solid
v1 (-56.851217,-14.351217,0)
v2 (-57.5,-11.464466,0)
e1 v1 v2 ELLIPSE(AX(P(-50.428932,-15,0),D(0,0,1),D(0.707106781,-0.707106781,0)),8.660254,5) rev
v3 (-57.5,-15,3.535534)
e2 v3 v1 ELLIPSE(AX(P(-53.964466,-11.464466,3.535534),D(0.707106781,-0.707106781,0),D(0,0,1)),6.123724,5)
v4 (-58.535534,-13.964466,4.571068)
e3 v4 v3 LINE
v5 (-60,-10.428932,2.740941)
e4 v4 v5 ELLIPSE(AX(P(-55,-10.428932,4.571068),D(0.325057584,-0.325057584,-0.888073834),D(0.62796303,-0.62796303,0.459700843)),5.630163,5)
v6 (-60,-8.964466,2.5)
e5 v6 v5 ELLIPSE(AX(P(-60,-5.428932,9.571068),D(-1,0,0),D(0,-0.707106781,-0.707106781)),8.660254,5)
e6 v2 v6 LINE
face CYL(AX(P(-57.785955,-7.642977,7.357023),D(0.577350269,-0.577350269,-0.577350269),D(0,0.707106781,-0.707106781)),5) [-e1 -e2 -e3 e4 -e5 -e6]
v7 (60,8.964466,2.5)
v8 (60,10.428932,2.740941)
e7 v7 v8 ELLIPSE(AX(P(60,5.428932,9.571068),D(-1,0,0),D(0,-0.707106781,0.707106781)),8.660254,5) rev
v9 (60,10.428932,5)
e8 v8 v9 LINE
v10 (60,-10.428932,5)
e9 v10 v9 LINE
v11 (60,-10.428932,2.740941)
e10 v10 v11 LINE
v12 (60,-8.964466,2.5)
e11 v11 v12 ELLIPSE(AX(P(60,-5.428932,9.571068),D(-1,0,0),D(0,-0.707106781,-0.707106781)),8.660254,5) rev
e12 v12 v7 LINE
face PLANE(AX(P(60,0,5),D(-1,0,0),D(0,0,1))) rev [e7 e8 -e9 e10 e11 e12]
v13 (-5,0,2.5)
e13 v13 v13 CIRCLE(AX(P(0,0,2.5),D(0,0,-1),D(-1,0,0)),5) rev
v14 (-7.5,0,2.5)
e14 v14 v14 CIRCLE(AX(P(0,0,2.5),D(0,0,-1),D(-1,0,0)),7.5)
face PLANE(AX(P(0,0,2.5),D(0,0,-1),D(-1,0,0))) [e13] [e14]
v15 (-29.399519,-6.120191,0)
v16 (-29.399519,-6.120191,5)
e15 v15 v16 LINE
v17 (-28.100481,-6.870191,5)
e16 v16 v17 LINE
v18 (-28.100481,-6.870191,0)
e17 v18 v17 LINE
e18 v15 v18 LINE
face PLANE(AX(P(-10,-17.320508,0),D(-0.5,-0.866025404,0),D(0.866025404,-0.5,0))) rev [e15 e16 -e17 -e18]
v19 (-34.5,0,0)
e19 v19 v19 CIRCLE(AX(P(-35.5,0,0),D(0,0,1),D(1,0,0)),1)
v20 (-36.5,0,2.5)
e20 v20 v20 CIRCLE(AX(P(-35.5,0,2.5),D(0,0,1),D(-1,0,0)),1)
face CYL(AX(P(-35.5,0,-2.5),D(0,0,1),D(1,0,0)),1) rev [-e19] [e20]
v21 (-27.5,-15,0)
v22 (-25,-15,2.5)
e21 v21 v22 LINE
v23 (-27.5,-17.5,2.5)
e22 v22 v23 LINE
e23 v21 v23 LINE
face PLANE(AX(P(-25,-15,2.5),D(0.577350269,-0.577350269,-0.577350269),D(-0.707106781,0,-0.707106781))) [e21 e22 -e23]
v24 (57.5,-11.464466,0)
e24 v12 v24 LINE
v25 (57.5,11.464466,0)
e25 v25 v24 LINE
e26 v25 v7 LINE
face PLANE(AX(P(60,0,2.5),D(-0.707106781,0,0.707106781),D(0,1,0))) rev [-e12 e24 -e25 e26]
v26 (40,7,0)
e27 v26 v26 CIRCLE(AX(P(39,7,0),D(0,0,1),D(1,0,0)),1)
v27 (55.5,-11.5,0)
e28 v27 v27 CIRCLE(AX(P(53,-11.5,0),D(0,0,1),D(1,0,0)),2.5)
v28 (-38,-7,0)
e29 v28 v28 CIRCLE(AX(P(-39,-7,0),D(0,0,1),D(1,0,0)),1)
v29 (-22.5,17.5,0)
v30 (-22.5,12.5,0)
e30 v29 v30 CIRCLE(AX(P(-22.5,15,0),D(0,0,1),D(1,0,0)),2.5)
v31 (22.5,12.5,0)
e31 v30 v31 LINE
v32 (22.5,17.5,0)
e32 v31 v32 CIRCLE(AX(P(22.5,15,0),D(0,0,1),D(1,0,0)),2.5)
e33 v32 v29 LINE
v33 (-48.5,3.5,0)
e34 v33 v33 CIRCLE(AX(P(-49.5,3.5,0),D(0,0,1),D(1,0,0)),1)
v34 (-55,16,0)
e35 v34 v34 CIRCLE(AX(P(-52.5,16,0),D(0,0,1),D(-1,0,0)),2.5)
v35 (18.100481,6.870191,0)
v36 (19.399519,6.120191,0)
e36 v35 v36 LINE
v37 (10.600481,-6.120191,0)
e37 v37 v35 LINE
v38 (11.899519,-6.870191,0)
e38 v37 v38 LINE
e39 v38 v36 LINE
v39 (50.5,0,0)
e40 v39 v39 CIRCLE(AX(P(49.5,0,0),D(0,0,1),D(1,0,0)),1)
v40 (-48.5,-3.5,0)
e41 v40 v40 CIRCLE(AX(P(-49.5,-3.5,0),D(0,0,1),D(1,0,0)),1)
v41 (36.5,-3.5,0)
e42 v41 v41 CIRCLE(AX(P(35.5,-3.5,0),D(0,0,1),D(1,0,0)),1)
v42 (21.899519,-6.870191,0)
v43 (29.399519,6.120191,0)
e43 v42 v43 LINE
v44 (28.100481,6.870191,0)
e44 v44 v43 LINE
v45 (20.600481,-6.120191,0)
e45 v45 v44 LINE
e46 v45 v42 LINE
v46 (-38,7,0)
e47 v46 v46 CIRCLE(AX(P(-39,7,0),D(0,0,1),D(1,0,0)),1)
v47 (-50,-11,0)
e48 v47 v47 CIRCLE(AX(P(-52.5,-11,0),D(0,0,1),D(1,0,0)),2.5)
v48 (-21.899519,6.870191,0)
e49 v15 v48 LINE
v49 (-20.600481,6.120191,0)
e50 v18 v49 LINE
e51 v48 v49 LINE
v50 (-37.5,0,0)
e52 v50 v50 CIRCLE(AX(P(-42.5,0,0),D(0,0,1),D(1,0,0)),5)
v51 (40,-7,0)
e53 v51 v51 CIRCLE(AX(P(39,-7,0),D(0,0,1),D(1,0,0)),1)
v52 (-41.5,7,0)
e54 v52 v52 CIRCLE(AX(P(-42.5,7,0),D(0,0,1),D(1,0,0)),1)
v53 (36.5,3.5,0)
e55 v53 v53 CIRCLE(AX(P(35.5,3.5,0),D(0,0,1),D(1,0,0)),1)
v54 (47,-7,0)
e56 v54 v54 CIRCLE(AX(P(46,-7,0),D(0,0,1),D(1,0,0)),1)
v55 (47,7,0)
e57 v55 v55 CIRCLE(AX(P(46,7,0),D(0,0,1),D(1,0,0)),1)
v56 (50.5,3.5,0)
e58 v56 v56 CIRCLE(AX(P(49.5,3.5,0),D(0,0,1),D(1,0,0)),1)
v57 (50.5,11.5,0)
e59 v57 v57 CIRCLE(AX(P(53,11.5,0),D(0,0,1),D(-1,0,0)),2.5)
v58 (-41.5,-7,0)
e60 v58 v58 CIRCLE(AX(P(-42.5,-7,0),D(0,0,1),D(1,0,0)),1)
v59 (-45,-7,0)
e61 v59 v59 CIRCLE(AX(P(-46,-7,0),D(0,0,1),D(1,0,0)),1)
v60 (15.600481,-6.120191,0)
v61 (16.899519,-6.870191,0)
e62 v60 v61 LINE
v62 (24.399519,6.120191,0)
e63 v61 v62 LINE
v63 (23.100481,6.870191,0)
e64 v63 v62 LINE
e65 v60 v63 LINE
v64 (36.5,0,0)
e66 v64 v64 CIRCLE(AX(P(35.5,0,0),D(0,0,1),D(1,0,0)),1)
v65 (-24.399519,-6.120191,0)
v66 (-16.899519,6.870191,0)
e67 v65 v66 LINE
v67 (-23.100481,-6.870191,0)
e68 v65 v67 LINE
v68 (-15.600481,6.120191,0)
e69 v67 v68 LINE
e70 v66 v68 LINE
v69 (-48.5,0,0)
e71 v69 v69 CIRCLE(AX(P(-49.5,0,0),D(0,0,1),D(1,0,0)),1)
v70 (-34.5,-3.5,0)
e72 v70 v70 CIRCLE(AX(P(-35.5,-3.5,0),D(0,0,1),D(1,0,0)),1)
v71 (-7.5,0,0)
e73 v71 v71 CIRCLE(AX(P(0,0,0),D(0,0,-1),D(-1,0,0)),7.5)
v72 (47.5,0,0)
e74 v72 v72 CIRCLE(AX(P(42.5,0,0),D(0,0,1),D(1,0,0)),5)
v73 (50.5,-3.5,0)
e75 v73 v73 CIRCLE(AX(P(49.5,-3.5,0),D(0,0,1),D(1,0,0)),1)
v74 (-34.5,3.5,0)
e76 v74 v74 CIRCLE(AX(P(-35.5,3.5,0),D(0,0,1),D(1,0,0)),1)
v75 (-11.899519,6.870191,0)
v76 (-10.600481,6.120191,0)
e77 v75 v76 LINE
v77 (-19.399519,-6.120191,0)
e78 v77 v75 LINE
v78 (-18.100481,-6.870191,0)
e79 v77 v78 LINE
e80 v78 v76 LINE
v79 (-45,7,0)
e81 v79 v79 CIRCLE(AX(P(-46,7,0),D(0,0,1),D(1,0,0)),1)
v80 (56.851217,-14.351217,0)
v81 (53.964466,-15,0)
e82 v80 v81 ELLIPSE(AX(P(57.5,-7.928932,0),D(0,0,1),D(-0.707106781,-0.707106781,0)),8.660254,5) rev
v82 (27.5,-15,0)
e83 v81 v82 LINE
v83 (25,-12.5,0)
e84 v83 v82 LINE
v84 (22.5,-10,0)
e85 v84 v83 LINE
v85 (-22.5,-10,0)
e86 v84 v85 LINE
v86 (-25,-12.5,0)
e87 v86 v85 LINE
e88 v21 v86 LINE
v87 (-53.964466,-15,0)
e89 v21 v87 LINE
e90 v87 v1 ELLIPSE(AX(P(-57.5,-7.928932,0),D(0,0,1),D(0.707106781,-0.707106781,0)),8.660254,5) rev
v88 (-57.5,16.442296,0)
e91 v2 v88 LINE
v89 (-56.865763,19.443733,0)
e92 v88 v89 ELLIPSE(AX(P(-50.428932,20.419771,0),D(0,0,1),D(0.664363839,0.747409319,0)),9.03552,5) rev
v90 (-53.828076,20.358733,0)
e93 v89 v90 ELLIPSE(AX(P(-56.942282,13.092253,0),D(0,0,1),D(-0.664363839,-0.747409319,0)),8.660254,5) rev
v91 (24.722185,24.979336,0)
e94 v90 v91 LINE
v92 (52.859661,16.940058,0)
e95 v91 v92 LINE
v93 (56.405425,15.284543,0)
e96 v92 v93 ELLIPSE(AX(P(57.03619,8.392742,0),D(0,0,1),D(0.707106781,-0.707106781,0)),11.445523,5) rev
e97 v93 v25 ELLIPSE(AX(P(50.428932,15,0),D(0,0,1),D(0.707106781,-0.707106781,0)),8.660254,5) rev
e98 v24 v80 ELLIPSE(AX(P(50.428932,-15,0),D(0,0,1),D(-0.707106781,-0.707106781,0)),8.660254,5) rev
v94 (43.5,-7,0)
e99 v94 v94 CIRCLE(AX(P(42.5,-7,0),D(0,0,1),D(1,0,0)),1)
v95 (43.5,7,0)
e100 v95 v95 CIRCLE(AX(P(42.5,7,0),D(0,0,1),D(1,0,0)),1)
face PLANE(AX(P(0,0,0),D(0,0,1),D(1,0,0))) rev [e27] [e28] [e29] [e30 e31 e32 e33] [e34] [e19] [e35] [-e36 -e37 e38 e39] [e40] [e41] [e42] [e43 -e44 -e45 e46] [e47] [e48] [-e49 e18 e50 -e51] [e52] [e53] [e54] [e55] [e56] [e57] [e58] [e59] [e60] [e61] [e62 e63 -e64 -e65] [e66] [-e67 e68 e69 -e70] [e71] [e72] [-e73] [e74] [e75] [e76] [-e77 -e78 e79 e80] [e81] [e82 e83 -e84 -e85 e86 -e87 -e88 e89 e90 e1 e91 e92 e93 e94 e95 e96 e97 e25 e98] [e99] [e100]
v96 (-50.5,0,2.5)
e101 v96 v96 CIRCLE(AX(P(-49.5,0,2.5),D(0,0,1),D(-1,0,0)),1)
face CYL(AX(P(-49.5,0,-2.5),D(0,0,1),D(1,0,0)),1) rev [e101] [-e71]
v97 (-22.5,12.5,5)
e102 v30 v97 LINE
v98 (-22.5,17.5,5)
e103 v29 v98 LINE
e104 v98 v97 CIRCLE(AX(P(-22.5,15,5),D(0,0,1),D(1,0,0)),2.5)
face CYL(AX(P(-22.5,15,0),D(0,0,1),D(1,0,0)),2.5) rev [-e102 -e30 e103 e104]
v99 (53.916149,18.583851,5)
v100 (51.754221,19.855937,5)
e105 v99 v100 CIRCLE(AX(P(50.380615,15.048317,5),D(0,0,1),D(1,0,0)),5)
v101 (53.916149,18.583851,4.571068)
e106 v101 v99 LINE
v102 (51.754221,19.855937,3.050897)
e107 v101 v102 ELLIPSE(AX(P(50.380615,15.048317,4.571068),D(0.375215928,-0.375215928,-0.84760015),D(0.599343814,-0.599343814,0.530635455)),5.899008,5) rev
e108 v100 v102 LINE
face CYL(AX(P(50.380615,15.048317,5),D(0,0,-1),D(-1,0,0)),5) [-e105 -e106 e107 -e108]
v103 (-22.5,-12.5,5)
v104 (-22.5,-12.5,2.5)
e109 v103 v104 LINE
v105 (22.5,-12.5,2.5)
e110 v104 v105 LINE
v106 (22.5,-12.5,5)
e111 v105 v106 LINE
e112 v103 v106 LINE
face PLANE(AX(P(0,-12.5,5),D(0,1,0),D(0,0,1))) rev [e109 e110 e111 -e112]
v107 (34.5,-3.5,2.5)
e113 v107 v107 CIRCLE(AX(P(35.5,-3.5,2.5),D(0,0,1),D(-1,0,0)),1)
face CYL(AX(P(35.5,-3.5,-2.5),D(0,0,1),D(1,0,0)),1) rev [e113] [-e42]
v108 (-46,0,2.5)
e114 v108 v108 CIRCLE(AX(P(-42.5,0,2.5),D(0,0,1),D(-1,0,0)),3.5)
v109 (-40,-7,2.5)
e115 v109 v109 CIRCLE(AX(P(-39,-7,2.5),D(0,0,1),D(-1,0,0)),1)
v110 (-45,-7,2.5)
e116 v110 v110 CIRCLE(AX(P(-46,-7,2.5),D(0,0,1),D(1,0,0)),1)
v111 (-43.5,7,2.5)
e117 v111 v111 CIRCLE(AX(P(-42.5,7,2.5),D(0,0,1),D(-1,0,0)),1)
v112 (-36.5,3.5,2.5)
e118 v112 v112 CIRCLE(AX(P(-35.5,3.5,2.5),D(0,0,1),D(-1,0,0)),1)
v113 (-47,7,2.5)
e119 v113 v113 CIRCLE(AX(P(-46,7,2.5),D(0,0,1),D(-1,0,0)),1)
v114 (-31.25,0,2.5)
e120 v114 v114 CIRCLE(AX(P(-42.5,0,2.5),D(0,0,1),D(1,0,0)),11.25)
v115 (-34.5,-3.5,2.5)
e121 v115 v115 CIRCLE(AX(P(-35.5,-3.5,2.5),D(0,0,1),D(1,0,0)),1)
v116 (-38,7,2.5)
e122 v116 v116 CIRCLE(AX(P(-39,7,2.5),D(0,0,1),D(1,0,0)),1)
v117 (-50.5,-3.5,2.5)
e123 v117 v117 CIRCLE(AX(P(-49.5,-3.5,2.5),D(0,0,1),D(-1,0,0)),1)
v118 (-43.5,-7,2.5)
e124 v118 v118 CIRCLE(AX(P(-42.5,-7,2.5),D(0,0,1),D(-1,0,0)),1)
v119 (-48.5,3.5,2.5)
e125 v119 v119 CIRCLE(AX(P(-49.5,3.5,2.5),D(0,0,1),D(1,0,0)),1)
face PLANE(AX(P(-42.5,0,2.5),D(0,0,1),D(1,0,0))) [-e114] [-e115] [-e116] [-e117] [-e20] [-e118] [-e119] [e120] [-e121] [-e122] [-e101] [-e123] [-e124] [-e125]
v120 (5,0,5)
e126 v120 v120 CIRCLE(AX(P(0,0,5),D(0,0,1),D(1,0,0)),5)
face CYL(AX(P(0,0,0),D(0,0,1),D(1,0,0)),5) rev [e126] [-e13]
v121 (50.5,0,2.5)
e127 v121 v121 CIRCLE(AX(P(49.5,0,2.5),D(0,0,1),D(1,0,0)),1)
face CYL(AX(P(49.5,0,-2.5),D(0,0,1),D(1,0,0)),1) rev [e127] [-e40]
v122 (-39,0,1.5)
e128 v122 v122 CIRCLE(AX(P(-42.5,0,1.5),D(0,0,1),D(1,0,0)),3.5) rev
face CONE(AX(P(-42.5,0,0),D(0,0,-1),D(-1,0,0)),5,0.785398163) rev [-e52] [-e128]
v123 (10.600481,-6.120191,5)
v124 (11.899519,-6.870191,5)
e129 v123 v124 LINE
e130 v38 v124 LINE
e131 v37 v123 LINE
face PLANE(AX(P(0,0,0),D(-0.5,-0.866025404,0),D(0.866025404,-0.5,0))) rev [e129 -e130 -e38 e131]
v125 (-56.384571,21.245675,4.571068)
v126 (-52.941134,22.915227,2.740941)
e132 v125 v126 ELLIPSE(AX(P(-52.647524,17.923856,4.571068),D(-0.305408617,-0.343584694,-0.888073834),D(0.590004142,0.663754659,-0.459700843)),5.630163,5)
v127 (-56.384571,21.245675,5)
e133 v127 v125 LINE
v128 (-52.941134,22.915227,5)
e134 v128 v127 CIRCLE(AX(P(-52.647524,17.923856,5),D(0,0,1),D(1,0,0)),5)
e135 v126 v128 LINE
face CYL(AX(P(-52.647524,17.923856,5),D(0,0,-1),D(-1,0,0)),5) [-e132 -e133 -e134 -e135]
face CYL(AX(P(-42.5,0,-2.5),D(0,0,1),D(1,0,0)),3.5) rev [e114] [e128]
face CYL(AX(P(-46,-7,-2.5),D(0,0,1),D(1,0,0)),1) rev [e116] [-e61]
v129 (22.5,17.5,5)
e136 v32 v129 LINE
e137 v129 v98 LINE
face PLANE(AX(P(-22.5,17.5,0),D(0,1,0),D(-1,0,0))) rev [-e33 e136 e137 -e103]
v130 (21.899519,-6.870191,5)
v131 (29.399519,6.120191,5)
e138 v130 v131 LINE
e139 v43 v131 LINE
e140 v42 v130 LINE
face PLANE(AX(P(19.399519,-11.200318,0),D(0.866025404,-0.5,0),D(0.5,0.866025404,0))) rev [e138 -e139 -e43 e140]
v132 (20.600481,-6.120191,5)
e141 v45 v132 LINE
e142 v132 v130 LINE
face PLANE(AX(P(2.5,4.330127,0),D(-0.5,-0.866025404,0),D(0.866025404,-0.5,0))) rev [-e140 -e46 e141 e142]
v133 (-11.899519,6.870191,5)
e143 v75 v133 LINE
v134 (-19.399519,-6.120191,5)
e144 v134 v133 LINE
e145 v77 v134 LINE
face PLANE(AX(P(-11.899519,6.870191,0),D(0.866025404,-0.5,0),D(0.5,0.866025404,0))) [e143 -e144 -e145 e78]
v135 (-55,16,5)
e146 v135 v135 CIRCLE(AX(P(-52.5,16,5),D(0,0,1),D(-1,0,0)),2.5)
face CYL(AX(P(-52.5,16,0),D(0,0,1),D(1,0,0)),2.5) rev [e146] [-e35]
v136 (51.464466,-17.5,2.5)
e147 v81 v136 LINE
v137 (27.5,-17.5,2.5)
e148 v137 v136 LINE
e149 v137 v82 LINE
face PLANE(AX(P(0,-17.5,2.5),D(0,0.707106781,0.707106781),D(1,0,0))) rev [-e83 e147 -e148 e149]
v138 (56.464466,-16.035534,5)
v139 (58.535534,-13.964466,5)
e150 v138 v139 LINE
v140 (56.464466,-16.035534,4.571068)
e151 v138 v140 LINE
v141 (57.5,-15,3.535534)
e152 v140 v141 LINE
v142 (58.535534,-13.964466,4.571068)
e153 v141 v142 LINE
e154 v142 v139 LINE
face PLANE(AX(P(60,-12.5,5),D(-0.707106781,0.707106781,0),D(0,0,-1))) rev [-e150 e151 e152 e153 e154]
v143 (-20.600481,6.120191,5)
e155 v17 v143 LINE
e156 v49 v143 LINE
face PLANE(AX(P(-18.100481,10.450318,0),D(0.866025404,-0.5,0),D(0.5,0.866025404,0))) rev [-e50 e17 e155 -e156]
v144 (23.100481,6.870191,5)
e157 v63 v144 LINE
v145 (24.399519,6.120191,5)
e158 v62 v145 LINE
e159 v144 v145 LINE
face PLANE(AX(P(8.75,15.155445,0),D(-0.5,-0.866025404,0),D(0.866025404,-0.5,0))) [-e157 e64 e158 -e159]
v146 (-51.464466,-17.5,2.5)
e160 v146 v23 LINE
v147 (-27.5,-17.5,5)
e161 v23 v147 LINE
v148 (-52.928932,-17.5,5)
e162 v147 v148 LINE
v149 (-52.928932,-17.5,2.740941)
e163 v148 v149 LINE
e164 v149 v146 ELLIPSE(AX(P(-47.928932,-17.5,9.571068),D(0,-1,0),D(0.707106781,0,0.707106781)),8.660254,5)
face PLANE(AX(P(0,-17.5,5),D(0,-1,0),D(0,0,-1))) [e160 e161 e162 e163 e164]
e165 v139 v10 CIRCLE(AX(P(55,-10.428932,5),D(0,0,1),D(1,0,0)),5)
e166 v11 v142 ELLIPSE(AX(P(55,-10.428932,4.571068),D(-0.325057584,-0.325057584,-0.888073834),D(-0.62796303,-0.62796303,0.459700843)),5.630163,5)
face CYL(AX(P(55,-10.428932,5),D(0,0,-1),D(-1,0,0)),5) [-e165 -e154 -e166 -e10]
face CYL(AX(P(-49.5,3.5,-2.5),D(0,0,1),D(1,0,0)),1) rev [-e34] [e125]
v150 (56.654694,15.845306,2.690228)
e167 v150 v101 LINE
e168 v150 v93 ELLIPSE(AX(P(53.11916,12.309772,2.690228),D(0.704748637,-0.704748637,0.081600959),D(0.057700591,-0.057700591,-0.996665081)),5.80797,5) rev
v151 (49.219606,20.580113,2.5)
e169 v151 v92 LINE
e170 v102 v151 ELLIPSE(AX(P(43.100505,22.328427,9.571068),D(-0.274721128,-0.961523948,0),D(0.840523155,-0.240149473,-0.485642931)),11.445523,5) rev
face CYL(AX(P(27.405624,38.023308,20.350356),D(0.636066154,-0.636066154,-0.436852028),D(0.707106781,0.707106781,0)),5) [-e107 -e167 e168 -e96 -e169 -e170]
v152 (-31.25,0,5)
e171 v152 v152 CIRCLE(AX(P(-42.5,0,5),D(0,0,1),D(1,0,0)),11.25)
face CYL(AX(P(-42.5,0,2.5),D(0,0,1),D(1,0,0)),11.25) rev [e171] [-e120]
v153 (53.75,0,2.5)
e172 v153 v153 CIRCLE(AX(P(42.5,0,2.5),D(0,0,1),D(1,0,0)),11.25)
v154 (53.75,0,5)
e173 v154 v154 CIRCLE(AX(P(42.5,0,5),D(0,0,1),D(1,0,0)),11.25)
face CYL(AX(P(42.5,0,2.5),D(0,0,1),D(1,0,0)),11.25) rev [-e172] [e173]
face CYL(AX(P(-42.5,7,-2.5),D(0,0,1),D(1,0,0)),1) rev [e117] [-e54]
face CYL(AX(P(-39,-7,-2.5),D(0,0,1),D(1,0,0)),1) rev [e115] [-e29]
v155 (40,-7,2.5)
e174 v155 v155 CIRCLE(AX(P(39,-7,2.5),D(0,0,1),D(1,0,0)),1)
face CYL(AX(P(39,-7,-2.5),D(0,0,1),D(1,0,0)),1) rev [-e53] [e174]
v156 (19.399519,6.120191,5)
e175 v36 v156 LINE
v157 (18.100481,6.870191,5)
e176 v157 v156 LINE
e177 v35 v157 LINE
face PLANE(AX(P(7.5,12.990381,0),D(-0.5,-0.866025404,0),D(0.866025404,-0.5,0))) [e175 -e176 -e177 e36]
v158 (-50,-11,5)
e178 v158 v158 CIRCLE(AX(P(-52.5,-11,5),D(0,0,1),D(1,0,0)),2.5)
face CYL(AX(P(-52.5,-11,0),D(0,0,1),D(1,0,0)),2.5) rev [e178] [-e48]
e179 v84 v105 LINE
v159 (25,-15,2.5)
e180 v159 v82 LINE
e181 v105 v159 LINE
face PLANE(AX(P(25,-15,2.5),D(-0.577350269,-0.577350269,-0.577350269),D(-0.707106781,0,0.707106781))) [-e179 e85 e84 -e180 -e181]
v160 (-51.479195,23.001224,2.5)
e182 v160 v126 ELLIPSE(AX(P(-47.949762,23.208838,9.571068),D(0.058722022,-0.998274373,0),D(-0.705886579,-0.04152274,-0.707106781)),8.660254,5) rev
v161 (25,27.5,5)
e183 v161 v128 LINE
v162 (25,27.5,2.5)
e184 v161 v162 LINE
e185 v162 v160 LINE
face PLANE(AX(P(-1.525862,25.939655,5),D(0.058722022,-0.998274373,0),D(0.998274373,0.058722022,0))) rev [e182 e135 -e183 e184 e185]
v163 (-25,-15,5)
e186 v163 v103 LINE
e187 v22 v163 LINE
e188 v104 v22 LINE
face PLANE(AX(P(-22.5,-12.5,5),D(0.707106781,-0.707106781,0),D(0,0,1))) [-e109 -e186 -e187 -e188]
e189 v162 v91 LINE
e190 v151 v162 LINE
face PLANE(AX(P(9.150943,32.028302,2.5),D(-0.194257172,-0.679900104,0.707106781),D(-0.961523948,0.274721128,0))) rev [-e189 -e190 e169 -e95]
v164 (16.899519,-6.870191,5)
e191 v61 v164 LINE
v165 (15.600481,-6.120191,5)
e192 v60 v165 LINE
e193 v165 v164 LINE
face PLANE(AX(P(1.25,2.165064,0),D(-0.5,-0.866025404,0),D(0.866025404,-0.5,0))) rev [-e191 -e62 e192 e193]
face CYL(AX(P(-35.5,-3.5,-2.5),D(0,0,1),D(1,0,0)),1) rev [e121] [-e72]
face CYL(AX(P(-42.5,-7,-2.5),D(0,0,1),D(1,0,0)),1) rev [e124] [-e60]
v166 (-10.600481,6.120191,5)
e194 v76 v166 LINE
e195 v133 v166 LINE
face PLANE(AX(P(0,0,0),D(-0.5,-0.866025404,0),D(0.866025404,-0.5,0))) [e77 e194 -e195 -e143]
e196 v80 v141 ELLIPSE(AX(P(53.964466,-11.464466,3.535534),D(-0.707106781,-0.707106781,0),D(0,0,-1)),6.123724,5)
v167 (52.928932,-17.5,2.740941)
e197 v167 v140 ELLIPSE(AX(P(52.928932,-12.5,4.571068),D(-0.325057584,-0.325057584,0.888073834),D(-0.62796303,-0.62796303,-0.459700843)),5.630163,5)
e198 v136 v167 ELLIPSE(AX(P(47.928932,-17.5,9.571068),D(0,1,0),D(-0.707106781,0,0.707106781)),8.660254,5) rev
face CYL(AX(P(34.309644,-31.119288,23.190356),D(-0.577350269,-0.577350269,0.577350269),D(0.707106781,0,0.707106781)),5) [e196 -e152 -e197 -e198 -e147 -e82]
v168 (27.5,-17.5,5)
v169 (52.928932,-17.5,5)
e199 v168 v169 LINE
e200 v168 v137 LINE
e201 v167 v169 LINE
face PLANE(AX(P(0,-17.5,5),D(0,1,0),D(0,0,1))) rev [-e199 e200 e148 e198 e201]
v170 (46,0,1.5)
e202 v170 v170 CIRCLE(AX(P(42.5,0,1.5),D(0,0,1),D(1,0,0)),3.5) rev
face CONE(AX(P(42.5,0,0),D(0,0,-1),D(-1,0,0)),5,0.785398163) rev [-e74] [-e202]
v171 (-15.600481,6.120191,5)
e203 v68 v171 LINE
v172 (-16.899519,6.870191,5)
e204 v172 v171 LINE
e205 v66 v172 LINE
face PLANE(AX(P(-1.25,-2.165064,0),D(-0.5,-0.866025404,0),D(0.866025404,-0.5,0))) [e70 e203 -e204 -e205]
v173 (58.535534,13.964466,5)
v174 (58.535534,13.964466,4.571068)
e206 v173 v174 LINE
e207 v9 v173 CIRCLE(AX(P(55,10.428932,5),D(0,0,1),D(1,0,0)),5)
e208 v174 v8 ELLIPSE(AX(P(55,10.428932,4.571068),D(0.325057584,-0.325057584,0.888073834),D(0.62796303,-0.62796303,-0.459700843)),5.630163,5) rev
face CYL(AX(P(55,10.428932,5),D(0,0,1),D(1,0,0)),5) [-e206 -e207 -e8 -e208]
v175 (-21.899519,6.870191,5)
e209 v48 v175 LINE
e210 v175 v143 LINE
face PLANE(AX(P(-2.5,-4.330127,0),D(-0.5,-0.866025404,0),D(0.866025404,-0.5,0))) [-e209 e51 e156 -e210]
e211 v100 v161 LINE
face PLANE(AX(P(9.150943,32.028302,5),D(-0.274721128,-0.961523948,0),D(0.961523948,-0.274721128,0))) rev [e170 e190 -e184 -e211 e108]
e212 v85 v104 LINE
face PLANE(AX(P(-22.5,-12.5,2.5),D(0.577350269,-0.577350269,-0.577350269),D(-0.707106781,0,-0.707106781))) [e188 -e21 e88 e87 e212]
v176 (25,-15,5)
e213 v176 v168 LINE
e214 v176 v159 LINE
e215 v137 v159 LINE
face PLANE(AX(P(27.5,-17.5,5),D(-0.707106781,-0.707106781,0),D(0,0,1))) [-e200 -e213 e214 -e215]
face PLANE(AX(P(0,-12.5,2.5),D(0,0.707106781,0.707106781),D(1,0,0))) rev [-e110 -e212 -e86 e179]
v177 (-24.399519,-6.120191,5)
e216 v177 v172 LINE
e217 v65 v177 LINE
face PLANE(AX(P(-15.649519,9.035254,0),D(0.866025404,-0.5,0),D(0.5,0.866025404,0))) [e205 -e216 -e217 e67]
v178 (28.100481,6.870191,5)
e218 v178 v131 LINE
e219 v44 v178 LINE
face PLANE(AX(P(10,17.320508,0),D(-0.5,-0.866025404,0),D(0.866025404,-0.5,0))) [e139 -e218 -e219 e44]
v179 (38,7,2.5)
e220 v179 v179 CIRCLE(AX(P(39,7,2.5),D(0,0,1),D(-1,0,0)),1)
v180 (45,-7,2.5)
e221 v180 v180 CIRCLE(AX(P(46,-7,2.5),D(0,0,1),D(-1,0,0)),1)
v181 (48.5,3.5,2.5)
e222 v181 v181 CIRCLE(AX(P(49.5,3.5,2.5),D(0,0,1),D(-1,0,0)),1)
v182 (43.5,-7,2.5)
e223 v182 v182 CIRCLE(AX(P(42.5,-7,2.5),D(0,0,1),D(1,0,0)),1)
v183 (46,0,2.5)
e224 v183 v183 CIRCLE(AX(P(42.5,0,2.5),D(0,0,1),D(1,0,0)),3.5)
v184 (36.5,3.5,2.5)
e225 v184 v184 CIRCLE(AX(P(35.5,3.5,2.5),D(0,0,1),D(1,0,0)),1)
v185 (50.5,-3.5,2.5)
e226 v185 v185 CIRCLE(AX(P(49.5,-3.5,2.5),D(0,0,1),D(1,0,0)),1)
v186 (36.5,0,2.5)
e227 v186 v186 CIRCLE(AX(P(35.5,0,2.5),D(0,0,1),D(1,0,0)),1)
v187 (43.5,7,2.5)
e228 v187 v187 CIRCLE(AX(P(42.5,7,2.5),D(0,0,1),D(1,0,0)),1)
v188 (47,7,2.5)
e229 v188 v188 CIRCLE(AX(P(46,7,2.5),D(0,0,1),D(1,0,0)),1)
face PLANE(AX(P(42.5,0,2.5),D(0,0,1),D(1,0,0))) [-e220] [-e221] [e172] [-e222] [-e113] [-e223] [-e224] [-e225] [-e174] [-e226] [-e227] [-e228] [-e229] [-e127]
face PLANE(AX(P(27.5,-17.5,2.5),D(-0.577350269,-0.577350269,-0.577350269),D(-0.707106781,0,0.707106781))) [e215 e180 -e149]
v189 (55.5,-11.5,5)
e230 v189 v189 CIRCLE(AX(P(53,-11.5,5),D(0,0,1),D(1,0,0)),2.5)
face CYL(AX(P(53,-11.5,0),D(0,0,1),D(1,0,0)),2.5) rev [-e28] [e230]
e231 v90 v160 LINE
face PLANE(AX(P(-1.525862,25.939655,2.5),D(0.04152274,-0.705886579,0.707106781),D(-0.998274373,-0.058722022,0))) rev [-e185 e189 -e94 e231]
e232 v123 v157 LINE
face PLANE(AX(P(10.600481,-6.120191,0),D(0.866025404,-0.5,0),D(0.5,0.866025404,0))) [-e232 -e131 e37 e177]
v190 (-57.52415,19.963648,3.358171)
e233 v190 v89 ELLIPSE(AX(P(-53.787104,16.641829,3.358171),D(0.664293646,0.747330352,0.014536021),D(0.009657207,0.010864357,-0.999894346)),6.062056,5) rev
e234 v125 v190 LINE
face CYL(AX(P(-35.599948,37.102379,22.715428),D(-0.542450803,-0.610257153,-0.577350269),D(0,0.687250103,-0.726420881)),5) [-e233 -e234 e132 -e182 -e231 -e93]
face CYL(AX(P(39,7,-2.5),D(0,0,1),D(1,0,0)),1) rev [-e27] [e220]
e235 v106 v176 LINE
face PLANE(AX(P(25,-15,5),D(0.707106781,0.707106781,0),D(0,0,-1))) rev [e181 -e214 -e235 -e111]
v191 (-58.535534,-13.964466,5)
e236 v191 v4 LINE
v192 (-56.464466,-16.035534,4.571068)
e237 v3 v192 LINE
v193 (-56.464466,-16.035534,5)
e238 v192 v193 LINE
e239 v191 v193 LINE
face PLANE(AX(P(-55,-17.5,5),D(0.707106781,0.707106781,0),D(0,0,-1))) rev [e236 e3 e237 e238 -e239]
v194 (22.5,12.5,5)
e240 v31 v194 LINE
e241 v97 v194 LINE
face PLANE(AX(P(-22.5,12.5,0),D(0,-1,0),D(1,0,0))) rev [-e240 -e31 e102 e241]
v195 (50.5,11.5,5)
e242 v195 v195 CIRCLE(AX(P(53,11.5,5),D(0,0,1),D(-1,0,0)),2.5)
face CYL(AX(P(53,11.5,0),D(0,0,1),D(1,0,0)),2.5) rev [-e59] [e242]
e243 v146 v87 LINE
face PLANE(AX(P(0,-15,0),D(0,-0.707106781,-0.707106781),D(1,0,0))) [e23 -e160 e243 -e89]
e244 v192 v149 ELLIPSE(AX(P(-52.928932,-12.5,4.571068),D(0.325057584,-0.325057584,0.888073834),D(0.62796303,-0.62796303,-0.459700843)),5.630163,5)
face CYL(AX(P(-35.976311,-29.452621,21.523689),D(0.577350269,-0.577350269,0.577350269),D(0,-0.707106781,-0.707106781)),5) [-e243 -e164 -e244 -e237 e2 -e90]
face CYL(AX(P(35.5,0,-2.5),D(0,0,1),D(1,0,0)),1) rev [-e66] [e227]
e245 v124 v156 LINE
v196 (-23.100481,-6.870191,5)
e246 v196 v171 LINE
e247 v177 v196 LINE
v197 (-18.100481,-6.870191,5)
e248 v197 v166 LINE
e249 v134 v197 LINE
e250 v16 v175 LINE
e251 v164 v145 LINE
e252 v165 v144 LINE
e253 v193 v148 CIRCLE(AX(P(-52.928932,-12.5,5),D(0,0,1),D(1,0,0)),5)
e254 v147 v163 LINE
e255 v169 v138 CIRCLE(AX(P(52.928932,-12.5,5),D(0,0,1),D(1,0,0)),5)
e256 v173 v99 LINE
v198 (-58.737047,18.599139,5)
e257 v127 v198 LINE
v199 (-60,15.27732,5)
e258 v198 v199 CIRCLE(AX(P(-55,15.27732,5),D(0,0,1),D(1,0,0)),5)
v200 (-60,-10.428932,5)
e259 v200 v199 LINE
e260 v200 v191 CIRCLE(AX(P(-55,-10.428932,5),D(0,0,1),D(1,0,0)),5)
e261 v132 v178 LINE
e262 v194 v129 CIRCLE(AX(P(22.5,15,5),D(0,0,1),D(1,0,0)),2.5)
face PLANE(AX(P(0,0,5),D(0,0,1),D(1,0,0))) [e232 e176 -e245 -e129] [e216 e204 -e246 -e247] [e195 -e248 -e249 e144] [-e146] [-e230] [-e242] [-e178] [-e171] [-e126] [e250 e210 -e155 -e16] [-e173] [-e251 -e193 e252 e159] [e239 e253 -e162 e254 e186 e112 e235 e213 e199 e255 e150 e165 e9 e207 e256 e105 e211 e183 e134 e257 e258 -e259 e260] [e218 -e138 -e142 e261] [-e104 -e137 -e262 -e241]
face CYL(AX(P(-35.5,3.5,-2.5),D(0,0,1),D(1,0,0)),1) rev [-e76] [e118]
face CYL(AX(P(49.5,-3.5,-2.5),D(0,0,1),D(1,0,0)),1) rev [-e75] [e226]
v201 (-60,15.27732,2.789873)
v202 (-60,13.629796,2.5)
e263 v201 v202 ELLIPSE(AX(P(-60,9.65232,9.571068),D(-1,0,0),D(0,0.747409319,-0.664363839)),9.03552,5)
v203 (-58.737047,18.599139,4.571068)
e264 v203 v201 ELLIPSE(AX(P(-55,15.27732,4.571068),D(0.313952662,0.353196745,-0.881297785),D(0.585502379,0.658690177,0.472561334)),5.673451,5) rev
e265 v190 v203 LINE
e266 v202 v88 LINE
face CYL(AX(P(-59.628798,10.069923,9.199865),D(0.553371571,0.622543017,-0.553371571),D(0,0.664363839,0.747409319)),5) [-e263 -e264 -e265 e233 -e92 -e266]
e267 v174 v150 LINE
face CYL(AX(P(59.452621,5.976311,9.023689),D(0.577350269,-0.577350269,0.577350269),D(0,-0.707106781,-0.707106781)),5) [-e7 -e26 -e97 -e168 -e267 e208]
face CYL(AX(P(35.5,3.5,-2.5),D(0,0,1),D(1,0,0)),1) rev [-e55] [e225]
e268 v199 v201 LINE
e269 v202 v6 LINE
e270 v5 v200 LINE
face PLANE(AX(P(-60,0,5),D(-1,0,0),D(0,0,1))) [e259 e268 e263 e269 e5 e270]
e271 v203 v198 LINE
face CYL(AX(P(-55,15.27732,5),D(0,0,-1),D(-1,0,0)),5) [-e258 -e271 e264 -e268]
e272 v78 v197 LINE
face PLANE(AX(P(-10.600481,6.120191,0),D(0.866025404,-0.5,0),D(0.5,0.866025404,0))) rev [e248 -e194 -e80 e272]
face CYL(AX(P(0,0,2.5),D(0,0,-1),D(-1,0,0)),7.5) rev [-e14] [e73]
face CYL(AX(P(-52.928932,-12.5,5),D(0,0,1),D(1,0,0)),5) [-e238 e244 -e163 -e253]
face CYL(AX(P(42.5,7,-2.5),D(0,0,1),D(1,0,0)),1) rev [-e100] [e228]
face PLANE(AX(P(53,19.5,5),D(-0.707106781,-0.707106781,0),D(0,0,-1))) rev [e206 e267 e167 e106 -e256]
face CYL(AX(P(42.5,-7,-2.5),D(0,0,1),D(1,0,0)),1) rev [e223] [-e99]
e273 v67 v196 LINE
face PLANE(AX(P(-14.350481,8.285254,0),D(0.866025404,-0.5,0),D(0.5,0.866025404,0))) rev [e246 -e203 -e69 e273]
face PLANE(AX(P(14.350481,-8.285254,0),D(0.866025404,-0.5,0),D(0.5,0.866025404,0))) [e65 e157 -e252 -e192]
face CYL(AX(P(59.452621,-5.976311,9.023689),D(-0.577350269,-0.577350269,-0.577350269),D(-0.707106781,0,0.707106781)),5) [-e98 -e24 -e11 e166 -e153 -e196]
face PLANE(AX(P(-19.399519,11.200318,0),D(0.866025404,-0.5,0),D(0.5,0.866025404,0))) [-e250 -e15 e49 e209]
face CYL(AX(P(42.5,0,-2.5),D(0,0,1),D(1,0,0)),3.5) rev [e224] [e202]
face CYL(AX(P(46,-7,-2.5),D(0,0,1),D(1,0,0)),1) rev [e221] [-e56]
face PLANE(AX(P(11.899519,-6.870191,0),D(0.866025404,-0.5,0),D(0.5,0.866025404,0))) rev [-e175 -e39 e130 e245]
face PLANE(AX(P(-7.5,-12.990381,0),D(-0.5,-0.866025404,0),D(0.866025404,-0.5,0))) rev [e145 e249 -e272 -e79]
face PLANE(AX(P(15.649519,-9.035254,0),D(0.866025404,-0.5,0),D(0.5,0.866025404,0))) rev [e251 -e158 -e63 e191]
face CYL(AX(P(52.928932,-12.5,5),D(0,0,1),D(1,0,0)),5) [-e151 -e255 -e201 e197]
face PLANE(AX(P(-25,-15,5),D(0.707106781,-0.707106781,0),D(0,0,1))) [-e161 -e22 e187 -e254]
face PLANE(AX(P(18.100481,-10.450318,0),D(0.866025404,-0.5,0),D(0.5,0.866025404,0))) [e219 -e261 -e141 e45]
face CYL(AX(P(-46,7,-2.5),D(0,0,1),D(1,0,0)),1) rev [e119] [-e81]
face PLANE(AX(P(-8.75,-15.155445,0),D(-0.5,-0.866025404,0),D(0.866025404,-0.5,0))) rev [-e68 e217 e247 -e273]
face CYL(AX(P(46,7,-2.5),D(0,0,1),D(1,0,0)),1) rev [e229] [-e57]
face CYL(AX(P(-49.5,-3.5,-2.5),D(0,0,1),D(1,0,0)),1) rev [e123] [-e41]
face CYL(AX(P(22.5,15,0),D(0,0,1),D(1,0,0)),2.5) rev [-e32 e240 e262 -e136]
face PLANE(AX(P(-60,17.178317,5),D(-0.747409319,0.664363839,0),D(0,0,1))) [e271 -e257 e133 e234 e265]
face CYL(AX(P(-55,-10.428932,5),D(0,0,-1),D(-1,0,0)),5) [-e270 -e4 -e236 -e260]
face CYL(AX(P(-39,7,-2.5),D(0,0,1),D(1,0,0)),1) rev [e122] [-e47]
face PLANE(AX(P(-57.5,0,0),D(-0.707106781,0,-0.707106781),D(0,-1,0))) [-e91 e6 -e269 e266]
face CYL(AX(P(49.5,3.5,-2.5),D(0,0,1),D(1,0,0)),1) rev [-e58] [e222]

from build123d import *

# Parameters (mm, degrees)
SKETCH1_W           = 17.5
SKETCH1_H           = 25
SKETCH1_W_2         = 50
BOSS_EXTRUDE1_DEPTH = 5
SKETCH2_R           = 11.25
CUT_EXTRUDE1_DEPTH  = 2.5
SKETCH3_R           = 1
SKETCH3_R_2         = 3.5
CUT_EXTRUDE2_DEPTH  = 5
SKETCH4_R           = 5
CUT_EXTRUDE3_DEPTH  = 5
CUT_EXTRUDE4_DEPTH  = 5
CHAMFER3_SIZE       = 1.5
BOSS_EXTRUDE2_DEPTH = 5
CHAMFER4_SIZE       = 2.5
CUT_EXTRUDE11_DEPTH = 5
SKETCH10_R          = 2.5
CUT_EXTRUDE13_DEPTH = 5
CHAMFER5_SIZE       = 5
CHAMFER5_SIZE_2     = 7.280109889
CHAMFER5_SIZE_3     = 5.321683239
FILLET1_R           = 5
SKETCH12_R          = 7.5
CUT_EXTRUDE14_DEPTH = 2.5


# Some blends are built 0.0001 mm under size
with BuildPart() as part:
    # Sketch1 → Boss-Extrude1 (new body)
    with BuildSketch(Plane.XY):
        with Locations((-33.75, 0)):
            Rectangle(SKETCH1_W, SKETCH1_H)
        Polygon((-25, -12.5), (-42.5, -12.5), (-42.5, 12.5), (-25, 12.5), (-25, 17.5), (-60, 17.5), (-60, -17.5), (-25, -17.5), align=None)
        Rectangle(SKETCH1_W_2, SKETCH1_H)
        with Locations((33.75, 0)):
            Rectangle(SKETCH1_W, SKETCH1_H)
        Polygon((42.5, -12.5), (25, -12.5), (25, -17.5), (60, -17.5), (60, 17.5), (25, 17.5), (25, 12.5), (42.5, 12.5), align=None)
    extrude(amount=BOSS_EXTRUDE1_DEPTH)

    # Sketch2 → Cut-Extrude1 (cut)
    with BuildSketch(Plane.XY.offset(5)):
        with Locations((-42.5, 0)):
            Circle(SKETCH2_R)
        with Locations((42.5, 0)):
            Circle(SKETCH2_R)
    extrude(amount=-CUT_EXTRUDE1_DEPTH, mode=Mode.SUBTRACT)

    # Sketch3 → Cut-Extrude2 (cut)
    with BuildSketch(Plane.XY.offset(2.5)):
        with Locations((42.5, 7)):
            Circle(SKETCH3_R)
        with Locations((46, 7)):
            Circle(SKETCH3_R)
        with Locations((39, 7)):
            Circle(SKETCH3_R)
        with Locations((42.5, 0)):
            Circle(SKETCH3_R_2)
        with Locations((-42.5, 0)):
            Circle(SKETCH3_R_2)
        with Locations((-39, 7)):
            Circle(SKETCH3_R)
        with Locations((-46, 7)):
            Circle(SKETCH3_R)
        with Locations((-42.5, 7)):
            Circle(SKETCH3_R)
        with Locations((49.5, 0)):
            Circle(SKETCH3_R)
        with Locations((49.5, -3.5)):
            Circle(SKETCH3_R)
        with Locations((49.5, 3.5)):
            Circle(SKETCH3_R)
        with Locations((42.5, -7)):
            Circle(SKETCH3_R)
        with Locations((39, -7)):
            Circle(SKETCH3_R)
        with Locations((46, -7)):
            Circle(SKETCH3_R)
        with Locations((35.5, 0)):
            Circle(SKETCH3_R)
        with Locations((35.5, 3.5)):
            Circle(SKETCH3_R)
        with Locations((35.5, -3.5)):
            Circle(SKETCH3_R)
        with Locations((-35.5, 3.5)):
            Circle(SKETCH3_R)
        with Locations((-35.5, 0)):
            Circle(SKETCH3_R)
        with Locations((-35.5, -3.5)):
            Circle(SKETCH3_R)
        with Locations((-39, -7)):
            Circle(SKETCH3_R)
        with Locations((-42.5, -7)):
            Circle(SKETCH3_R)
        with Locations((-46, -7)):
            Circle(SKETCH3_R)
        with Locations((-49.5, -3.5)):
            Circle(SKETCH3_R)
        with Locations((-49.5, 0)):
            Circle(SKETCH3_R)
        with Locations((-49.5, 3.5)):
            Circle(SKETCH3_R)
    extrude(amount=-CUT_EXTRUDE2_DEPTH, mode=Mode.SUBTRACT)

    # Sketch4 → Cut-Extrude3 (cut)
    with BuildSketch(Plane.XY.offset(5)):
        Circle(SKETCH4_R)
    extrude(amount=-CUT_EXTRUDE3_DEPTH, mode=Mode.SUBTRACT)

    # Sketch5 → Cut-Extrude4 (cut)
    with BuildSketch(Plane.XY.offset(5)):
        Polygon((20.600480947, -6.120190528), (21.899519053, -6.870190528), (29.399519053, 6.120190528), (28.100480947, 6.870190528), align=None)
        Polygon((15.600480947, -6.120190528), (23.100480947, 6.870190528), (24.399519053, 6.120190528), (16.899519053, -6.870190528), align=None)
        Polygon((10.600480947, -6.120190528), (18.100480947, 6.870190528), (19.399519053, 6.120190528), (11.899519053, -6.870190528), align=None)
        Polygon((-19.399519053, -6.120190528), (-11.899519053, 6.870190528), (-10.600480947, 6.120190528), (-18.100480947, -6.870190528), align=None)
        Polygon((-24.399519053, -6.120190528), (-16.899519053, 6.870190528), (-15.600480947, 6.120190528), (-23.100480947, -6.870190528), align=None)
        Polygon((-29.399519053, -6.120190528), (-21.899519053, 6.870190528), (-20.600480947, 6.120190528), (-28.100480947, -6.870190528), align=None)
    extrude(amount=-CUT_EXTRUDE4_DEPTH, mode=Mode.SUBTRACT)

    # Chamfer3
    chamfer3_edges = [part.edges().sort_by_distance(p)[0] for p in [
        (39, 0, 0),
        (-46, 0, 0),
    ]]
    chamfer(chamfer3_edges, length=CHAMFER3_SIZE)

    # Sketch7 → Boss-Extrude2 (add)
    with BuildSketch(Plane(origin=(0, 0, 0), x_dir=(-1, 0, 0), z_dir=(0, 0, -1))):
        Polygon((-25, 27.5), (-60, 17.5), (-25, 17.5), (-25, 12.5), (25, 12.5), (25, 17.5), (60, 17.5), (60, 22.5), align=None)
    extrude(amount=-BOSS_EXTRUDE2_DEPTH)

    # Chamfer4
    chamfer4_edges = [part.edges().sort_by_distance(p)[0] for p in [
        (-42.5, -17.5, 0),
        (-60, 2.5, 0),
        (60, 0, 0),
        (42.5, -17.5, 0),
        (25, -15, 0),
        (0, -12.5, 0),
        (-25, -15, 0),
        (-25, -17.5, 2.5),
        (25, -17.5, 2.5),
        (25, -12.5, 2.5),
        (-25, -12.5, 2.5),
        (42.5, 22.5, 0),
        (-17.5, 25, 0),
    ]]
    chamfer(chamfer4_edges, length=CHAMFER4_SIZE - 0.0001)  # a hair under: the kernel refuses the full size

    # Sketch8 → Cut-Extrude11 (cut)
    with BuildSketch(Plane.XY.offset(5)):
        with BuildLine():
            Line((-22.5, 17.5), (22.5, 17.5))
            ThreePointArc((22.5, 17.5), (25, 15), (22.5, 12.5))
            Line((22.5, 12.5), (-22.5, 12.5))
            ThreePointArc((-22.5, 12.5), (-25, 15), (-22.5, 17.5))
        make_face()
    extrude(amount=-CUT_EXTRUDE11_DEPTH, mode=Mode.SUBTRACT)

    # Sketch10 → Cut-Extrude13 (cut)
    with BuildSketch(Plane.XY.offset(5)):
        with Locations((-52.5, -11)):
            Circle(SKETCH10_R)
        with Locations((53, -11.5)):
            Circle(SKETCH10_R)
        with Locations(Location((53, 11.5, 0), (0, 0, 180))):
            Circle(SKETCH10_R)
        with Locations(Location((-52.5, 16, 0), (0, 0, 180))):
            Circle(SKETCH10_R)
    extrude(amount=-CUT_EXTRUDE13_DEPTH, mode=Mode.SUBTRACT)

    # Chamfer5
    # the kernel refuses this chamfer: 7.280109889, 5.321683239, 5 mm, written as the material it takes off along each edge
    with BuildSketch(Plane(origin=(-60, -17.5, -10.35851494), x_dir=(0.9996219169112968, -0.027495876610586317, 0), z_dir=(0, 0, 1)), Plane(origin=(60, -17.5, -10.35851494), x_dir=(0.027495876610586317, 0.9996219169112968, 0), z_dir=(0, 0, 1))) as chamfer5_piece_1:
        Polygon((CHAMFER5_SIZE * 0.999621916911, CHAMFER5_SIZE * 0.0274958766106), (-CHAMFER5_SIZE * 0.0274958766106, CHAMFER5_SIZE * 0.999621916911), (0, 0), align=None)
    extrude(amount=28.21692988, mode=Mode.SUBTRACT)
    with BuildSketch(Plane(origin=(60, 17.5, -16.34008853), x_dir=(-0.9561991759280333, 0.2927168187080304, 0), z_dir=(0, 0, 1))) as chamfer5_piece_2:
        Polygon((CHAMFER5_SIZE_2 * 0.999823900998, CHAMFER5_SIZE_2 * 0.0187661149602), (-CHAMFER5_SIZE * 0.292716818708, CHAMFER5_SIZE * 0.956199175928), (0, 0), align=None)
    extrude(amount=40.18007706, mode=Mode.SUBTRACT)
    with BuildSketch(Plane(origin=(-60, 22.5, -11.206616296), x_dir=(-0.02579454785928718, -0.9996672652941752, 0), z_dir=(0, 0, 1))) as chamfer5_piece_3:
        Polygon((CHAMFER5_SIZE_3 * 0.99966726536, CHAMFER5_SIZE_3 * 0.025794547861), (-CHAMFER5_SIZE * 0.0844525191923, CHAMFER5_SIZE * 0.996427504639), (0, 0), align=None)
    extrude(amount=29.913132593, mode=Mode.SUBTRACT)

    # Fillet1
    # the kernel refuses this fillet: 5 mm, written as the material it takes off along each edge
    with BuildSketch(Plane(origin=(-64.166666667, -8.333333333, 6.666566667), x_dir=(0.40824829046408034, 0.8164965809275085, -0.4082482904640807), z_dir=(0.5773502691894717, -0.5773502691899334, -0.5773502691894724)), Plane(origin=(53.333433333, 19.166566667, -4.166666667), x_dir=(-0.4082482904639215, 0.40824829046385264, 0.8164965809277018), z_dir=(0.5773502691896591, -0.5773502691895585, 0.5773502691896599)), Plane(origin=(61.666566667, -10.833433333, -4.166666667), x_dir=(0.40824829046391753, 0.4082482904635908, 0.816496580927835), z_dir=(-0.5773502691899336, -0.5773502691894719, 0.5773502691894719))) as fillet1_piece_1:
        with BuildLine():
            CenterArc((FILLET1_R * 0.577350269189, FILLET1_R), FILLET1_R, 210, 60)
            Line((-FILLET1_R * 0.288675134595, FILLET1_R * 0.5), (0, 0))
            Line((0, 0), (FILLET1_R * 0.577350269189, 0))
        make_face()
    extrude(amount=18.763710544, mode=Mode.SUBTRACT)
    with BuildSketch(Plane(origin=(-50.833333333, -21.666666667, 6.666566667), x_dir=(0.8164965809279436, 0.4082482904636451, -0.4082482904636457), z_dir=(-0.577350269189318, 0.5773502691897797, -0.5773502691897796)), Plane(origin=(64.166666667, -8.333333333, 6.666566667), x_dir=(-0.4082482904636451, 0.8164965809279439, -0.4082482904636454), z_dir=(-0.5773502691897794, -0.5773502691893178, -0.5773502691897802)), Plane(origin=(-51.093826671, 27.197761756, 6.666566667), x_dir=(-0.38357064118824047, -0.4315169713371016, 0.8164965809276222), z_dir=(-0.5424508028963463, -0.6102571532588589, -0.5773502691897726))) as fillet1_piece_2:
        with BuildLine():
            CenterArc((FILLET1_R * 0.57735026919, -FILLET1_R), FILLET1_R, 90, 60)
            Line((-FILLET1_R * 0.288675134595, -FILLET1_R * 0.5), (0, 0))
            Line((0, 0), (FILLET1_R * 0.57735026919, 0))
        make_face()
    extrude(amount=18.763710544, mode=Mode.SUBTRACT)
    with BuildSketch(Plane(origin=(60.502410392, 11.997589608, -2.652776612), x_dir=(-0.7467824303447061, -0.364905051191258, -0.5560218568937372), z_dir=(-0.6360661543203274, 0.6360661543202165, 0.43685202833046355))) as fillet1_piece_3:
        with BuildLine():
            CenterArc((FILLET1_R * 0.485798657646, FILLET1_R), FILLET1_R, 218.179161485, 51.820838515)
            Line((-FILLET1_R * 0.300283099109, FILLET1_R * 0.381877462231), (0, 0))
            Line((0, 0), (FILLET1_R * 0.485798657646, 0))
        make_face()
    extrude(amount=17.867499102, mode=Mode.SUBTRACT)
    with BuildSketch(Plane(origin=(53, 19.5, -0.739175352), x_dir=(0.7071067811866106, -0.7071067811864844, 0), z_dir=(0, 0, 1))) as fillet1_piece_4:
        with BuildLine():
            CenterArc((FILLET1_R * 0.259126028197, -FILLET1_R), FILLET1_R, 90, 29.054604099)
            Line((-FILLET1_R * 0.226516902981, -FILLET1_R * 0.125842723878), (0, 0))
            Line((0, 0), (FILLET1_R * 0.259126028197, 0))
        make_face()
    extrude(amount=8.978250705, mode=Mode.SUBTRACT)
    with BuildSketch(Plane(origin=(60, 12.5, -2.67776953), x_dir=(-0.7071067811866102, 0.707106781186485, 0), z_dir=(0, 0, 1)), Plane(origin=(55, -17.5, -2.67776953), x_dir=(0.7071067811868306, 0.7071067811862645, 0), z_dir=(0, 0, 1)), Plane(origin=(-60, -12.5, -2.67776953), x_dir=(0.7071067811862649, -0.7071067811868301, 0), z_dir=(0, 0, 1)), Plane(origin=(-55.008628134, 22.79361011, -2.67776953), x_dir=(-0.6643638388296346, -0.7474093186839131, 0), z_dir=(0, 0, 1))) as fillet1_piece_5:
        with BuildLine():
            CenterArc((FILLET1_R * 0.414213562373, FILLET1_R), FILLET1_R, 225, 45)
            Line((-FILLET1_R * 0.292893218813, FILLET1_R * 0.292893218814), (0, 0))
            Line((0, 0), (FILLET1_R * 0.414213562373, 0))
        make_face()
    extrude(amount=12.855439059, mode=Mode.SUBTRACT)
    with BuildSketch(Plane(origin=(60, -12.5, -2.67776953), x_dir=(-0.7071067811868297, -0.7071067811862654, 0), z_dir=(0, 0, 1)), Plane(origin=(-55, -17.5, -2.67776953), x_dir=(-0.7071067811862645, 0.7071067811868306, 0), z_dir=(0, 0, 1))) as fillet1_piece_6:
        with BuildLine():
            CenterArc((FILLET1_R * 0.414213562373, -FILLET1_R), FILLET1_R, 90, 45)
            Line((-FILLET1_R * 0.292893218814, -FILLET1_R * 0.292893218814), (0, 0))
            Line((0, 0), (FILLET1_R * 0.414213562373, 0))
        make_face()
    extrude(amount=12.855439059, mode=Mode.SUBTRACT)
    with BuildSketch(Plane(origin=(-60, 17.178316761, -2.252591529), x_dir=(0.6643638388296347, 0.7474093186839131, 0), z_dir=(0, 0, 1))) as fillet1_piece_7:
        with BuildLine():
            CenterArc((FILLET1_R * 0.380199322349, -FILLET1_R), FILLET1_R, 90, 41.633539337)
            Line((-FILLET1_R * 0.284164516481, -FILLET1_R * 0.252590681316), (0, 0))
            Line((0, 0), (FILLET1_R * 0.380199322349, 0))
        make_face()
    extrude(amount=12.005083059, mode=Mode.SUBTRACT)
    with BuildSketch(Plane(origin=(-53.658288342, 24.312742376, -3.841811658), x_dir=(0.440204389240274, -0.7825855808709965, -0.44020438924027366), z_dir=(-0.5533715710926945, -0.6225430174797603, 0.5533715710926953))) as fillet1_piece_8:
        with BuildLine():
            CenterArc((FILLET1_R * 0.555404268528, FILLET1_R), FILLET1_R, 211.904040139, 58.095959861)
            Line((-FILLET1_R * 0.293530154836, FILLET1_R * 0.471501802437), (0, 0))
            Line((0, 0), (FILLET1_R * 0.555404268528, 0))
        make_face()
    extrude(amount=18.402686095, mode=Mode.SUBTRACT)

    # Sketch12 → Cut-Extrude14 (cut)
    with BuildSketch(Plane(origin=(0, 0, 0), x_dir=(-1, 0, 0), z_dir=(0, 0, -1))):
        Circle(SKETCH12_R)
    extrude(amount=-CUT_EXTRUDE14_DEPTH, mode=Mode.SUBTRACT)


solid = part.part
